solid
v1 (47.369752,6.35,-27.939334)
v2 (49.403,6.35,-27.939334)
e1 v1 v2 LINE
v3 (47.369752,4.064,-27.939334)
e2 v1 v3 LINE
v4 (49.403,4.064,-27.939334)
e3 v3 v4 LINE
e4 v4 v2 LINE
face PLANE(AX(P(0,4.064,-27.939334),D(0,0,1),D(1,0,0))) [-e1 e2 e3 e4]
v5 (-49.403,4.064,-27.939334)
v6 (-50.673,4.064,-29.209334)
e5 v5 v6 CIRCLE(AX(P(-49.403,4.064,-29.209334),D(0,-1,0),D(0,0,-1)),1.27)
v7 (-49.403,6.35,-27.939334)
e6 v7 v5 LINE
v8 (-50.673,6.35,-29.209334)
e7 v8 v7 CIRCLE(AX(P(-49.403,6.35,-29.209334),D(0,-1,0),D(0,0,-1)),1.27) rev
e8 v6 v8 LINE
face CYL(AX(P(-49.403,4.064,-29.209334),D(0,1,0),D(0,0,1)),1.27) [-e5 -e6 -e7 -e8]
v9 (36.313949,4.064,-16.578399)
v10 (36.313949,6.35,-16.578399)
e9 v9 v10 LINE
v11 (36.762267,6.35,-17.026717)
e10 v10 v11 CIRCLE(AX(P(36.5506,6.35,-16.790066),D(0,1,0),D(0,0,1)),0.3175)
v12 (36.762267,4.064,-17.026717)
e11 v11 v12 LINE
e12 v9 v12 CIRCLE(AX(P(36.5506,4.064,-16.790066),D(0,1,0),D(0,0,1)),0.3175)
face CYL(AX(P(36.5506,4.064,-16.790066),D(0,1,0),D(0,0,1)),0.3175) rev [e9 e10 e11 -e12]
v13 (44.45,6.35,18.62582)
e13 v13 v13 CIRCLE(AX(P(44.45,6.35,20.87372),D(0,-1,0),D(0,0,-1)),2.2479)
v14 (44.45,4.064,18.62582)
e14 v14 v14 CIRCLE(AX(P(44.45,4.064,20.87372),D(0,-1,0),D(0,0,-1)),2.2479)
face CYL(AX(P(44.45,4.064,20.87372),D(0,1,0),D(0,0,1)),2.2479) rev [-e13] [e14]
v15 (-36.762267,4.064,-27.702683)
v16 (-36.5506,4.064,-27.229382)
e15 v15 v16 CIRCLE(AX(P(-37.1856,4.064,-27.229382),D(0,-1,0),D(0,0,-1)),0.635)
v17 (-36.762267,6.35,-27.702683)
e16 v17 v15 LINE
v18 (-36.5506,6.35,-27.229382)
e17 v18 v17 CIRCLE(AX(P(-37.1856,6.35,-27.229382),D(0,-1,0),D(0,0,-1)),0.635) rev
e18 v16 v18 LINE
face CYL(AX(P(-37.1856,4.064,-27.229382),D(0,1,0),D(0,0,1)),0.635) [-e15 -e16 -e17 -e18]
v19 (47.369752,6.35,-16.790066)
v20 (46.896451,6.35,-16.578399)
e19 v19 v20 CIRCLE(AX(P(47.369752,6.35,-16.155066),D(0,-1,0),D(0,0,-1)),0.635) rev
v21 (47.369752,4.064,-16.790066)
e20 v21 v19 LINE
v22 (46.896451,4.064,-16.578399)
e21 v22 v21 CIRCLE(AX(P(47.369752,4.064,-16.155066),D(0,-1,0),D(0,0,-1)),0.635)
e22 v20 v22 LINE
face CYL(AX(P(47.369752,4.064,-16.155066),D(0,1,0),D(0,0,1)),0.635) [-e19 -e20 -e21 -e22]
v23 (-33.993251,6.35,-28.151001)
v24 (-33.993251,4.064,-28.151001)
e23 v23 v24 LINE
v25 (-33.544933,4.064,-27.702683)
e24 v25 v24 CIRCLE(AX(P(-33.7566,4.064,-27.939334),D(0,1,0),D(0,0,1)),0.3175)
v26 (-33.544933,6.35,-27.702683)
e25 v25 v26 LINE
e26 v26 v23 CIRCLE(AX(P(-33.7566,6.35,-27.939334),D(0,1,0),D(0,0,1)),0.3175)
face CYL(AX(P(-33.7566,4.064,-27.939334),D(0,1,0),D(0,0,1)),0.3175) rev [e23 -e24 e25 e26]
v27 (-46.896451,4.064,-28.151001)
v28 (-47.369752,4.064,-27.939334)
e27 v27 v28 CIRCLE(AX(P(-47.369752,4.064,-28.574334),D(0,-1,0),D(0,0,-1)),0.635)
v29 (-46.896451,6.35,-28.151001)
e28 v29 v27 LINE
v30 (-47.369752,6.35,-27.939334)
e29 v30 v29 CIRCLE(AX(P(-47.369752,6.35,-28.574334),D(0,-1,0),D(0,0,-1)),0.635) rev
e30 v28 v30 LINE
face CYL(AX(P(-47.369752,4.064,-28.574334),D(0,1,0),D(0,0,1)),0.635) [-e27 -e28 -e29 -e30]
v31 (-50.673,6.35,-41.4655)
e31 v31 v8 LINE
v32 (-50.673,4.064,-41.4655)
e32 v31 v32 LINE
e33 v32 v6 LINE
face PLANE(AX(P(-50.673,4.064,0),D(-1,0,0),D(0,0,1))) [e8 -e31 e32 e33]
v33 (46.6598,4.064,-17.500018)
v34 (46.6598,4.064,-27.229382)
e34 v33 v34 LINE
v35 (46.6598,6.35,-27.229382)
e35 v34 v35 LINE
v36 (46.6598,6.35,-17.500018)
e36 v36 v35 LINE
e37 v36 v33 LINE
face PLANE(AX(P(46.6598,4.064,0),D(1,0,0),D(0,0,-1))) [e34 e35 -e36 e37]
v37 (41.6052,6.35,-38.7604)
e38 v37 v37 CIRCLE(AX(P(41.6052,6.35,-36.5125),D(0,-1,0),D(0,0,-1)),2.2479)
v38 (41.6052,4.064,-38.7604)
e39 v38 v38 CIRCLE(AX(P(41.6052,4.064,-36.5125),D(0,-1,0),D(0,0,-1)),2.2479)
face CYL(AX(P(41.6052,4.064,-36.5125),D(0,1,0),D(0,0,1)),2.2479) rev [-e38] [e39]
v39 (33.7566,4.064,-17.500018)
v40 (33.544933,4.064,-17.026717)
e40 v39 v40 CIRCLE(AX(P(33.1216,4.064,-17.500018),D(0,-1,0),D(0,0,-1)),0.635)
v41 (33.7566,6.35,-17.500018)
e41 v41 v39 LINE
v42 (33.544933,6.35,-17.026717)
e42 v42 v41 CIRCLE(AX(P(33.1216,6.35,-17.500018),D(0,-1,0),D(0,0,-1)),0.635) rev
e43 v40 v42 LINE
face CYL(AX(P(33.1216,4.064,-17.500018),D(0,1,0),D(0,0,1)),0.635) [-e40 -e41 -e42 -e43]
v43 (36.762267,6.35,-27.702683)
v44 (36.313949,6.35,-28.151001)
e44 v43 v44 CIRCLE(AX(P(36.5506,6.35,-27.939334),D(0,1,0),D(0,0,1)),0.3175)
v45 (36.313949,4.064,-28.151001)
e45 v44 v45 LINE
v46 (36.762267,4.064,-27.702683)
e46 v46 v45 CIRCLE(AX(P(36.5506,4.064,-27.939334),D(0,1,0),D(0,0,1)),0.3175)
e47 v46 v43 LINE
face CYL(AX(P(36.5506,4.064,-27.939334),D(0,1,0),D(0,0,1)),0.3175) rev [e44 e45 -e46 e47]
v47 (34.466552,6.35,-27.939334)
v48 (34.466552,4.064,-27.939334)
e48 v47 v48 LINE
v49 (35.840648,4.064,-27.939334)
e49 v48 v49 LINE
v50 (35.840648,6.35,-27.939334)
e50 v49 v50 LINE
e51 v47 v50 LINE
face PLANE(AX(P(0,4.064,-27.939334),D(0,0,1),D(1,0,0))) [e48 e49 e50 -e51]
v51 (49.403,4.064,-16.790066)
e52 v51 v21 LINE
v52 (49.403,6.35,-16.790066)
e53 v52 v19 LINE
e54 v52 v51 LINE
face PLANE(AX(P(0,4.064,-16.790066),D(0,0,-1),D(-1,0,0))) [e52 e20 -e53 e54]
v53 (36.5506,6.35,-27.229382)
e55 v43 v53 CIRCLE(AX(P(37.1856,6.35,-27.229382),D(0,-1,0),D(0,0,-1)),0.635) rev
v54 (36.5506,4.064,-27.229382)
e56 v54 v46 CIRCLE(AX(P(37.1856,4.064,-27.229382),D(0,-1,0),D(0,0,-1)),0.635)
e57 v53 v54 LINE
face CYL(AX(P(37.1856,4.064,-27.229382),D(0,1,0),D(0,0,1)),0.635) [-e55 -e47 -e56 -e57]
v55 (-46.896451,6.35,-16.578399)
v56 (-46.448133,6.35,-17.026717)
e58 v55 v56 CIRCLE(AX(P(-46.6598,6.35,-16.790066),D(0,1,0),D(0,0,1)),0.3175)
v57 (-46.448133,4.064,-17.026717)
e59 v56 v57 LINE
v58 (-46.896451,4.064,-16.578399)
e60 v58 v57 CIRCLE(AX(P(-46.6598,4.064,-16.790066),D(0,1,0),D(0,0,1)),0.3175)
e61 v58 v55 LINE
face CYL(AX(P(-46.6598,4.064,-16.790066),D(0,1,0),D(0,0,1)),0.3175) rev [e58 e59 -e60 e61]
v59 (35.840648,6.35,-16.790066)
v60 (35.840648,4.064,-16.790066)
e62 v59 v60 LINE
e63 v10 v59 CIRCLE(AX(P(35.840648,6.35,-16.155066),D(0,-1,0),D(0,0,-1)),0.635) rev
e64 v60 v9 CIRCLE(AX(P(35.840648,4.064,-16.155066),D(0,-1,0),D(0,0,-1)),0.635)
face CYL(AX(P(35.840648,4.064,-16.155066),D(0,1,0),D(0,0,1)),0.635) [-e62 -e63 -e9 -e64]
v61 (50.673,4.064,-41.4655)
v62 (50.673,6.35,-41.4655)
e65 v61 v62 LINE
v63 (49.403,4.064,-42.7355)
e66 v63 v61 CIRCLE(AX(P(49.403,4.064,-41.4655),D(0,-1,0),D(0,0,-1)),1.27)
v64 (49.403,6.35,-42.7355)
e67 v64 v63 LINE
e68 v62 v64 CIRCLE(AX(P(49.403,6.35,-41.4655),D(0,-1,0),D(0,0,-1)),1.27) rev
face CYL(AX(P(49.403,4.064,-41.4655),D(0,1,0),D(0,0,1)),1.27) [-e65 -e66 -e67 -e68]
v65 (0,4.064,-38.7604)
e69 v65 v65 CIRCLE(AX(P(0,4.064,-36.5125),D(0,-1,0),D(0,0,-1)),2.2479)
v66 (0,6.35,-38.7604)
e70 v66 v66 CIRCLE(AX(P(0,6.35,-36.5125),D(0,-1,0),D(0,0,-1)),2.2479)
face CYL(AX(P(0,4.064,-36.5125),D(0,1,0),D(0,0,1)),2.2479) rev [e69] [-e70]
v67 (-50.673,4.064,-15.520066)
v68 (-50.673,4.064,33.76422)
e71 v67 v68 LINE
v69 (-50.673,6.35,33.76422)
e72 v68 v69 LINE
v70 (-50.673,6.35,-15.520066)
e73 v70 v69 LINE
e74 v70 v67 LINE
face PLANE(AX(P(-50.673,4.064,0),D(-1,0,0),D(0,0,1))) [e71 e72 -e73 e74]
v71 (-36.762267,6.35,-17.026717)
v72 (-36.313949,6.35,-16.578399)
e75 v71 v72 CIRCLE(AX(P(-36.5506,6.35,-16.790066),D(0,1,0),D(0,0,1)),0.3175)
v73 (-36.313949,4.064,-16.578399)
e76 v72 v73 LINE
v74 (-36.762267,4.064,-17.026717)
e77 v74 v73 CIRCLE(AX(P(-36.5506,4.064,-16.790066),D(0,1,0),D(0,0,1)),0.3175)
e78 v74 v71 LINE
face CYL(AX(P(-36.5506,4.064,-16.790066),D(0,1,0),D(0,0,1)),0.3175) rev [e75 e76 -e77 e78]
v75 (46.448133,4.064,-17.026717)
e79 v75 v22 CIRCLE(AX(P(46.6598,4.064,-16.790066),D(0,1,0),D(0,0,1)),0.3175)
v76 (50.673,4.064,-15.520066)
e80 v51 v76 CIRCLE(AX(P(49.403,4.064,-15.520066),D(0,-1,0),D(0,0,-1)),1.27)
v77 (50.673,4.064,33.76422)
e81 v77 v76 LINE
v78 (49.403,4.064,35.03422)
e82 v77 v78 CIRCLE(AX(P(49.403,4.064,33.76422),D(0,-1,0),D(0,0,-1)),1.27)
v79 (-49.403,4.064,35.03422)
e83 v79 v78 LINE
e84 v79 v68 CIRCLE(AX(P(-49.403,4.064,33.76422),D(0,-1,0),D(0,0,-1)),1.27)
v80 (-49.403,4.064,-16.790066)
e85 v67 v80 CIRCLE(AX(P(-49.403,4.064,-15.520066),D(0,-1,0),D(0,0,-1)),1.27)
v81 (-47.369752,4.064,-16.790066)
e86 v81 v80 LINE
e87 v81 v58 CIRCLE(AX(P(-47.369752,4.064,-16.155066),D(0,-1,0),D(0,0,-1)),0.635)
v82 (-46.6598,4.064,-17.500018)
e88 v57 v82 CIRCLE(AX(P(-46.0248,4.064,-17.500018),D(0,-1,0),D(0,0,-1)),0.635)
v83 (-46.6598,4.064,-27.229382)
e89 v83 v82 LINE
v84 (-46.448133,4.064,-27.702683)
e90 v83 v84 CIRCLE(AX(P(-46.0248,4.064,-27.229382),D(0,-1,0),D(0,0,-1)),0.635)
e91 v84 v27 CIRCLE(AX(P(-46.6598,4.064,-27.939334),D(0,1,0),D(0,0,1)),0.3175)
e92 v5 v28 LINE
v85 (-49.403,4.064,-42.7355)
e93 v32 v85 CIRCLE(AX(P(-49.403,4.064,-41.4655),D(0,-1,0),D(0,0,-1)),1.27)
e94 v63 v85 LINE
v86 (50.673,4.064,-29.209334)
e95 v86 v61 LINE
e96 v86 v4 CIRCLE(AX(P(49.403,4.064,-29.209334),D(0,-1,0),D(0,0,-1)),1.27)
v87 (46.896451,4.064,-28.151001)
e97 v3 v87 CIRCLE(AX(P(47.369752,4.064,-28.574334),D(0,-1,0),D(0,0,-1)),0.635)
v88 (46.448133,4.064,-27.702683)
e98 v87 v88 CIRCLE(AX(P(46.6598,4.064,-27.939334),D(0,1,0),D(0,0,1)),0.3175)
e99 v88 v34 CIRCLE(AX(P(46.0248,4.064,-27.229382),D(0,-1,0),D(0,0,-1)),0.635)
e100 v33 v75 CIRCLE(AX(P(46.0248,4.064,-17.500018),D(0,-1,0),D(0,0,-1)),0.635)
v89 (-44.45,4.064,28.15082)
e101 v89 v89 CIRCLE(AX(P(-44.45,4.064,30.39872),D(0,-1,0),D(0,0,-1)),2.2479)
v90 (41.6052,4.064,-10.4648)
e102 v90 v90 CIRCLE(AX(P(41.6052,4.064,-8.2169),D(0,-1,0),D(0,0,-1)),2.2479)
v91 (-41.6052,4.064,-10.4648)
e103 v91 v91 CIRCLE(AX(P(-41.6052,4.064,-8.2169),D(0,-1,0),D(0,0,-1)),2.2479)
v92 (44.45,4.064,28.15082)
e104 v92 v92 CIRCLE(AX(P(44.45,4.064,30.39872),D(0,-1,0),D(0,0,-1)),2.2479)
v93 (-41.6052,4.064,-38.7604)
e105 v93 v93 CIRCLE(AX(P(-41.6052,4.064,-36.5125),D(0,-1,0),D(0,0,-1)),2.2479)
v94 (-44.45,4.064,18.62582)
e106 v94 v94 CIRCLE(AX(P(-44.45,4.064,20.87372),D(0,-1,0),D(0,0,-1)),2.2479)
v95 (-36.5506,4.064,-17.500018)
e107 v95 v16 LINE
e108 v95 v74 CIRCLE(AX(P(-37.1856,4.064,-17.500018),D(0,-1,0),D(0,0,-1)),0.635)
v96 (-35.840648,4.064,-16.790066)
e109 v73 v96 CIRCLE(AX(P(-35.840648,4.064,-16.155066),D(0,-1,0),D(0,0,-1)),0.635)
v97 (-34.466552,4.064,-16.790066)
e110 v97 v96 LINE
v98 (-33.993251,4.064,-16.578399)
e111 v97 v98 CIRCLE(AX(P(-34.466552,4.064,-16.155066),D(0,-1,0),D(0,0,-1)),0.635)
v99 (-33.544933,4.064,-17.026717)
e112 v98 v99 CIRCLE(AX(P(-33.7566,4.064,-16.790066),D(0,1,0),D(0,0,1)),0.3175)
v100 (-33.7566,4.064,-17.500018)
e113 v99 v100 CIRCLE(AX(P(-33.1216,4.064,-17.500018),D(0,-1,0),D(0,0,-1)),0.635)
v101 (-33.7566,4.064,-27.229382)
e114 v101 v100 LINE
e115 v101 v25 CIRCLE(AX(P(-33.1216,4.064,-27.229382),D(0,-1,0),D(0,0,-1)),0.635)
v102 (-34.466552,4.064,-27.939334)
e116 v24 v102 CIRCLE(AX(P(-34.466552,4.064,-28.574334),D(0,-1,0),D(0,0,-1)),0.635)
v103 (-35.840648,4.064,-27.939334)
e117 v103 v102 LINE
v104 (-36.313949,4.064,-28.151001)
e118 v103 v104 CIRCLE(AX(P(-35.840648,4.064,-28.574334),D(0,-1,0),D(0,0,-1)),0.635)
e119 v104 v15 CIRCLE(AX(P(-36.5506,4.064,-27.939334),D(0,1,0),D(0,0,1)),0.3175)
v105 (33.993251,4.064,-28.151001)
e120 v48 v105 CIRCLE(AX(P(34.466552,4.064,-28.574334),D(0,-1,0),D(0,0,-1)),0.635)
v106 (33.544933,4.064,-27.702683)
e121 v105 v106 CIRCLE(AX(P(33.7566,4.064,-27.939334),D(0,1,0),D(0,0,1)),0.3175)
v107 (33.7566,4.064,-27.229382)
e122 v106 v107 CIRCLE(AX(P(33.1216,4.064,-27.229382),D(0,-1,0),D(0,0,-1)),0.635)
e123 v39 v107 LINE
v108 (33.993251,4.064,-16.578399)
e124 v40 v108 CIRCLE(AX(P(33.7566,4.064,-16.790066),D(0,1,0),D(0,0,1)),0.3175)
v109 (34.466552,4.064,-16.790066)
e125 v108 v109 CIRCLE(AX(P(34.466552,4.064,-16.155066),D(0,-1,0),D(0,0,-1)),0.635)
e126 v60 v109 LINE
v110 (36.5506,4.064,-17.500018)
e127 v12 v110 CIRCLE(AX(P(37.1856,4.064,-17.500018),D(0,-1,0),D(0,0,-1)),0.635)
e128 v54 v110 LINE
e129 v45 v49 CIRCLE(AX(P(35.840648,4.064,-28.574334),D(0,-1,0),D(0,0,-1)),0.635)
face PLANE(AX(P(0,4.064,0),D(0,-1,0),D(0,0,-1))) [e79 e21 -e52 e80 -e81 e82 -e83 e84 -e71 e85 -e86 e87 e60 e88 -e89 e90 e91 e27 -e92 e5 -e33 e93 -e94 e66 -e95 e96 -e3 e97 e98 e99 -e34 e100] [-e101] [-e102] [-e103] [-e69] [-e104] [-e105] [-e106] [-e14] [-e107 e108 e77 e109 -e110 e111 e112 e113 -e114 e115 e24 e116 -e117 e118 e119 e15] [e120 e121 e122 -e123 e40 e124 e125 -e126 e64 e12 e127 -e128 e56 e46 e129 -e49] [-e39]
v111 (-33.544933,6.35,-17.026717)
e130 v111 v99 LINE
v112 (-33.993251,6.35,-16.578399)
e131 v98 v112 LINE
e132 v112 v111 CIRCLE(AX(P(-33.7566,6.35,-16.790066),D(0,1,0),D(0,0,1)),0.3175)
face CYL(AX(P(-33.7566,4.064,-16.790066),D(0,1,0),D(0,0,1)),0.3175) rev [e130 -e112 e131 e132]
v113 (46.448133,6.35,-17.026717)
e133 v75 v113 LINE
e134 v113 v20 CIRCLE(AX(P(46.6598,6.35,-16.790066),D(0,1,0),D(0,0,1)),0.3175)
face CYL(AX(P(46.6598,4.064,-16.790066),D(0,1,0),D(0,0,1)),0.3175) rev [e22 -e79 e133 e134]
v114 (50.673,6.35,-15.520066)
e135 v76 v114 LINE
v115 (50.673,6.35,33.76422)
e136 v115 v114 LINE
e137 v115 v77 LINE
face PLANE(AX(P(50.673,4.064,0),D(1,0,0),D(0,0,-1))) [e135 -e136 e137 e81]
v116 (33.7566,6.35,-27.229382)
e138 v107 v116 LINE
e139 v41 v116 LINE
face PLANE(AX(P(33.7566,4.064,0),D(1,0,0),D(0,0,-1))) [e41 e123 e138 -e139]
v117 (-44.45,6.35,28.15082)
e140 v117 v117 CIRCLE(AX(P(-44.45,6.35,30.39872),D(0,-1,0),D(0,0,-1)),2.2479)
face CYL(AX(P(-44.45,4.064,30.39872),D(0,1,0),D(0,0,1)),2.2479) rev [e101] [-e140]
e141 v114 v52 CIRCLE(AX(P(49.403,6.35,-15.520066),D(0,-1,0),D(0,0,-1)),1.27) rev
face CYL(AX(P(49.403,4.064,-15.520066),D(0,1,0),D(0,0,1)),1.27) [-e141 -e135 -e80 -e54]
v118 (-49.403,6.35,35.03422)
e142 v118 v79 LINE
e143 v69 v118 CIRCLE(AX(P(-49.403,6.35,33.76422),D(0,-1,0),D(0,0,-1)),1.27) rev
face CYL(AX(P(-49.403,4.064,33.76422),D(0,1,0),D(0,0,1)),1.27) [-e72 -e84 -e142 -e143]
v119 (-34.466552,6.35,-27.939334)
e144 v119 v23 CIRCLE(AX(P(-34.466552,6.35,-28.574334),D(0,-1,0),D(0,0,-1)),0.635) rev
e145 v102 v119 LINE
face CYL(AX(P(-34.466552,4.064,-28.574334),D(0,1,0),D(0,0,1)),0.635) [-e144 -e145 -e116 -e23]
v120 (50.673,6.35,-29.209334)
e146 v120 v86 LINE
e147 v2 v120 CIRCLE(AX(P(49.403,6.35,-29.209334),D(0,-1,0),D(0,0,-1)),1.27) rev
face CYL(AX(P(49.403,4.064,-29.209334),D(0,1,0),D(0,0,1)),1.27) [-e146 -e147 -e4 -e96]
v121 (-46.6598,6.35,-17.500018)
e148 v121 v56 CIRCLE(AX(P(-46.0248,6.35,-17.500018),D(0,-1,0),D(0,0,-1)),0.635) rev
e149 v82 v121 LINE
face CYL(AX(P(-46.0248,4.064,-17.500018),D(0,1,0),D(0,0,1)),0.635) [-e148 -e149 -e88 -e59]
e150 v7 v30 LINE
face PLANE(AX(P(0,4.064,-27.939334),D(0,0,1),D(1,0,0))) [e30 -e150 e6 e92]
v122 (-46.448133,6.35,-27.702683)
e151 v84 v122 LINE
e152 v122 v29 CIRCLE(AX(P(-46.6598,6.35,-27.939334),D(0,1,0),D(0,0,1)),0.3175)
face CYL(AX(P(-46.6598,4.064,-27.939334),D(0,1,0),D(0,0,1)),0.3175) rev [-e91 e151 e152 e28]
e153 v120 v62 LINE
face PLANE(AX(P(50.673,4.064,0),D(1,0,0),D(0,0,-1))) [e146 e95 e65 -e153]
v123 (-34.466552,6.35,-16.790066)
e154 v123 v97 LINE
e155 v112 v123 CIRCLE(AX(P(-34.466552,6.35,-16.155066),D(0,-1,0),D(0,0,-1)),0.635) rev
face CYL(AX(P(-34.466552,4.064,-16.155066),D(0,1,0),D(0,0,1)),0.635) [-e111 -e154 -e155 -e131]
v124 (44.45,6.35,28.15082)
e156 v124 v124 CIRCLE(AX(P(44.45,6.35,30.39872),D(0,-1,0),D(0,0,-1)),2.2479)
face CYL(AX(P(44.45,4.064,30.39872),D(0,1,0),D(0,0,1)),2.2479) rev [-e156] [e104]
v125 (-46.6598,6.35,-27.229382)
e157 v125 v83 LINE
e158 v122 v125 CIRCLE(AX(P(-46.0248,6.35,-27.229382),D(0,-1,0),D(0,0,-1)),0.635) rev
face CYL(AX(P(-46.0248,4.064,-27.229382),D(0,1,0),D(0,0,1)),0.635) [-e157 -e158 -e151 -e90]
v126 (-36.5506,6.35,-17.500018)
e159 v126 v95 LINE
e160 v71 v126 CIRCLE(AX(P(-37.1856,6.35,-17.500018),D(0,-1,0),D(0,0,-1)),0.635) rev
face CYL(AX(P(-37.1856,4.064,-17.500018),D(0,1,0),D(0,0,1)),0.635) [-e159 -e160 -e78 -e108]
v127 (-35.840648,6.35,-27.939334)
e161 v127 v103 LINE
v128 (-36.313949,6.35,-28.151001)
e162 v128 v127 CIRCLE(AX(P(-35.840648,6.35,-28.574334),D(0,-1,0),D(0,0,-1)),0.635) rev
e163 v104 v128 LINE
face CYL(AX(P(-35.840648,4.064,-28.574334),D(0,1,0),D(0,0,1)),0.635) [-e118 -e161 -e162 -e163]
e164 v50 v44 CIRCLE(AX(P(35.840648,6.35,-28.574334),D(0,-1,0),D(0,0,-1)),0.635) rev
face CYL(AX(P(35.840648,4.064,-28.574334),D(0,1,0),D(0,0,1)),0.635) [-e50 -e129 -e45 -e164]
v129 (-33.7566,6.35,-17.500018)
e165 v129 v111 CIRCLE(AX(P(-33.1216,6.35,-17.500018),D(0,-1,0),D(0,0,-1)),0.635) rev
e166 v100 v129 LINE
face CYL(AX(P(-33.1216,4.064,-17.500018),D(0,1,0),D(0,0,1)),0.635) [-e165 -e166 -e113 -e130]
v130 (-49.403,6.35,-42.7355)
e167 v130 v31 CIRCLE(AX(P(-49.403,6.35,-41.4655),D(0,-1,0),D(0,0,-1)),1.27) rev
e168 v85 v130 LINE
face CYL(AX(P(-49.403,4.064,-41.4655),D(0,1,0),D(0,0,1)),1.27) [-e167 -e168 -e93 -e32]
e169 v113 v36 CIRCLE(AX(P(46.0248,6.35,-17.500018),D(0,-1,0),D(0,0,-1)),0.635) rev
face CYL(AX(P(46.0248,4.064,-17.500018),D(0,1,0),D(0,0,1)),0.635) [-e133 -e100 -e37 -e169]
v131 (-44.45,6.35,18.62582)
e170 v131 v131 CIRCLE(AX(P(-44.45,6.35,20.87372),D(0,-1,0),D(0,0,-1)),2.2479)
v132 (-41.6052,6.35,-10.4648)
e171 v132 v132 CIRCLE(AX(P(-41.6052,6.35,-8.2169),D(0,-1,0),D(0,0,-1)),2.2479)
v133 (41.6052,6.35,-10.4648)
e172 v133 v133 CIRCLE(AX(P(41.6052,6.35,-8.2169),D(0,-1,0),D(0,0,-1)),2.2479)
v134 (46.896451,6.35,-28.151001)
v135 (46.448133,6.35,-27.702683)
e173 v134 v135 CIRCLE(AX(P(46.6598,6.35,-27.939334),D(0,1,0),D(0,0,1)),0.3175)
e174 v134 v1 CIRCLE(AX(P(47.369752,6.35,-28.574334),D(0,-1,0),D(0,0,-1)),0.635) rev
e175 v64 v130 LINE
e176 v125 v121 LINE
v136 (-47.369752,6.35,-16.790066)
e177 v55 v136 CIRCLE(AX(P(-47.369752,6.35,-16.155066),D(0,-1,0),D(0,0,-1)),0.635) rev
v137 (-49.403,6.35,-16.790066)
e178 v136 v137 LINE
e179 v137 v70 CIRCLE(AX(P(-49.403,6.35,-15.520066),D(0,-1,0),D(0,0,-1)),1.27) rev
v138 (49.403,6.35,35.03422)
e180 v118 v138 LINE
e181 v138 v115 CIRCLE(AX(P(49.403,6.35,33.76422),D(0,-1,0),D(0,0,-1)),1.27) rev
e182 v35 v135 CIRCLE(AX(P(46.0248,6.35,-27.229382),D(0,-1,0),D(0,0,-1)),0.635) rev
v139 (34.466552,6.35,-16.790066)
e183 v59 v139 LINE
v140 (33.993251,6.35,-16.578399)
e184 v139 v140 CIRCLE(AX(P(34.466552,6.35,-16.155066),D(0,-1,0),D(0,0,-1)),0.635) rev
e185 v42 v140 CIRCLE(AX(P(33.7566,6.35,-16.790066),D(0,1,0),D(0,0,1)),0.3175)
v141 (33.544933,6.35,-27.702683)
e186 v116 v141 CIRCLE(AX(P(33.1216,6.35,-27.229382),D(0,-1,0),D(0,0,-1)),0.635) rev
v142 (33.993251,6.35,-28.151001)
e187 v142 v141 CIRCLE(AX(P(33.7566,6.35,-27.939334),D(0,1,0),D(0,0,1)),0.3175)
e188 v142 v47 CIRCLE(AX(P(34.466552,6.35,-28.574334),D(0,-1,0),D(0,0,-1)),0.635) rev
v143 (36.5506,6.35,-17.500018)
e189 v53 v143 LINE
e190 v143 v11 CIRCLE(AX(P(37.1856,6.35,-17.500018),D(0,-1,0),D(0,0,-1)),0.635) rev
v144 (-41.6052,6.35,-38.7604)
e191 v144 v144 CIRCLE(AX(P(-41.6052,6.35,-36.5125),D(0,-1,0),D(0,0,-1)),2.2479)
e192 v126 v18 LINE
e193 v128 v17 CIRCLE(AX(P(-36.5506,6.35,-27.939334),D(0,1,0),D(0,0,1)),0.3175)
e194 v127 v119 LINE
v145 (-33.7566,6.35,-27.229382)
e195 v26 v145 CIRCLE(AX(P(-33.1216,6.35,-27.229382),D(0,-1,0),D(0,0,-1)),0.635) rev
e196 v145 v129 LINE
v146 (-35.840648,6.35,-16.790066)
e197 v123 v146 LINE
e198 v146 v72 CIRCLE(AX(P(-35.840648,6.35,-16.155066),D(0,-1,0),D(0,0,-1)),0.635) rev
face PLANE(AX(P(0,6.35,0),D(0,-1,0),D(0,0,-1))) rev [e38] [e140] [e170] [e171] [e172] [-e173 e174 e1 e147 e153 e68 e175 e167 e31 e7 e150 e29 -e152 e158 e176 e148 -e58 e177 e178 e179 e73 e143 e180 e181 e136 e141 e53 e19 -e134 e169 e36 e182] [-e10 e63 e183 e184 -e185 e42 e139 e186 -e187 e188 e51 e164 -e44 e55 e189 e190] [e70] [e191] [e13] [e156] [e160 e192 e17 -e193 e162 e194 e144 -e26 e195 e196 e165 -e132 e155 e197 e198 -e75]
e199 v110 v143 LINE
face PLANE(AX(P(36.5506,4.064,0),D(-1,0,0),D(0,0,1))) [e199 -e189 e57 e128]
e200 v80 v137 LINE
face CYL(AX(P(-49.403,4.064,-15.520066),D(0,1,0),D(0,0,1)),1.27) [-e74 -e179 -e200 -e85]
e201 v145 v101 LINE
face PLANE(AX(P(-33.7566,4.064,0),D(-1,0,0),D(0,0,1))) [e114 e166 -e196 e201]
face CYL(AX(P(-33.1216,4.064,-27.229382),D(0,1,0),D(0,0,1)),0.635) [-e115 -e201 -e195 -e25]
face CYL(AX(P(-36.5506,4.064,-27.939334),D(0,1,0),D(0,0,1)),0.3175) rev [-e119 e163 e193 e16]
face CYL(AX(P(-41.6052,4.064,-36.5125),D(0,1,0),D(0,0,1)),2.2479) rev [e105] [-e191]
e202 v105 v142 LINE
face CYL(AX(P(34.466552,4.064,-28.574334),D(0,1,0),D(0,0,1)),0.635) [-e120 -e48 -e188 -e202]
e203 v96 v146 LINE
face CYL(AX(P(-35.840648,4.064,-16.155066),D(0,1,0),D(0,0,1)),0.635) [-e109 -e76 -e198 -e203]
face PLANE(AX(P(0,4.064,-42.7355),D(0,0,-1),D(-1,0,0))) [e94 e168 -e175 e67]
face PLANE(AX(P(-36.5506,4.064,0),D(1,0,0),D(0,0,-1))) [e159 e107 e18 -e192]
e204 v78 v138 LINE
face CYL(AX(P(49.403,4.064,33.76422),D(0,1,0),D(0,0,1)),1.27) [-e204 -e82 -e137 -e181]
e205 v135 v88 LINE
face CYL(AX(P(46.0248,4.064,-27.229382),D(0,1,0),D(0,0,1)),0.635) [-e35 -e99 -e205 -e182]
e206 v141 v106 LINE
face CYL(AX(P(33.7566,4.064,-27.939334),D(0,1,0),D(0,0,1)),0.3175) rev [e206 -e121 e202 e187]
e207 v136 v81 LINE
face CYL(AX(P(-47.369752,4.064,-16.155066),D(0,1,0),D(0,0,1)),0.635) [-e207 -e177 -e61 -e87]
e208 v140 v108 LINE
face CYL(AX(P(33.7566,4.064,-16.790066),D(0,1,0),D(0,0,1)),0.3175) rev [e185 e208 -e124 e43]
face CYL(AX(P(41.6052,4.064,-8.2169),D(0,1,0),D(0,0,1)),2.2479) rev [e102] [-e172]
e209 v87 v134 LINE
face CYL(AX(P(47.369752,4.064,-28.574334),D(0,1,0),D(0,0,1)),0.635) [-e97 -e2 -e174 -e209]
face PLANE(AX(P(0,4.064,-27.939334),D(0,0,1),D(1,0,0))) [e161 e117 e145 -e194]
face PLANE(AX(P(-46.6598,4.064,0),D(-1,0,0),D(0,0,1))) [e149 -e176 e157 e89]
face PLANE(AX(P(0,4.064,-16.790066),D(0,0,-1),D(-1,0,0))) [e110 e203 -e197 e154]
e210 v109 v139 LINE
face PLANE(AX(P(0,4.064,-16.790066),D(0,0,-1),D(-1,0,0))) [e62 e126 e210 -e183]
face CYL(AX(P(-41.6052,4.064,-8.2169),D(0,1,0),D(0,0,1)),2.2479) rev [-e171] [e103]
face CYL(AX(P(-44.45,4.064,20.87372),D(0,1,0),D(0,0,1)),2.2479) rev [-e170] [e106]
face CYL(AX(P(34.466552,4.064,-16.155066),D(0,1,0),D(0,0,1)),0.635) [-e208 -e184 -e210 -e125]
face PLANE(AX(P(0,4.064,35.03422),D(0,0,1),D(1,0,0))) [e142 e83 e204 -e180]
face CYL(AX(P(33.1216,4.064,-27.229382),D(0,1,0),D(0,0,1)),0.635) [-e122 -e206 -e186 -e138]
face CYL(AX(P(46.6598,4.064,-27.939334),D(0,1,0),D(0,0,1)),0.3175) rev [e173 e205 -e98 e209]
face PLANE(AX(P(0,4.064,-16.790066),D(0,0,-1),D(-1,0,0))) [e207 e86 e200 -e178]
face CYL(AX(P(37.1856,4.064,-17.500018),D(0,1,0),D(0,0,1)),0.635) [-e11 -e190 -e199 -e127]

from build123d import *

# Parameters (mm, degrees)
STOCK_BEE_ZERKER_START                     = 4.064
STOCK_BEE_ZERKER_2_0_MULTIBODY_1_OUTLINE_R = 2.2479
STOCK_BEE_ZERKER_2_0_MULTIBODY_1_OUTLINE_W = 2.54
STOCK_BEE_ZERKER_2_0_MULTIBODY_1_OUTLINE_H = 10.89526775
STOCK_BEE_ZERKER_2_0_MULTIBODY_1_DEPTH     = 2.286
SKETCH1_W                                  = 2.794
SKETCH1_H                                  = 11.14926775
SKETCH1_W_2                                = 2.54
SKETCH1_H_2                                = 10.89526775
CUT_EXTRUDE1_DEPTH                         = 67.506087708
SKETCH2_R                                  = 0.3175
CUT_EXTRUDE2_DEPTH                         = 67.327231853
FILLET1_R                                  = 0.635
FILLET2_R                                  = 1.27


# Read off the part's stored shape, not the designer's step: Stock-Bee-zerker 2.0 Multibody-1
with BuildPart() as part:
    # Stock-Bee-zerker 2.0 Multibody-1 outline → Stock-Bee-zerker 2.0 Multibody-1 (new body)
    with BuildSketch(Plane(origin=(0, 0, 0), x_dir=(1, 0, 0), z_dir=(0, 1, 0)).offset(STOCK_BEE_ZERKER_START)):
        Polygon((-50.8, 16.917066125), (-50.8, -35.16122), (50.8, -35.16122), (50.8, 16.917066125), (46.7868, 16.917066125), (46.7868, 27.812333875), (50.8, 27.812333875), (50.8, 42.8625), (-50.8, 42.8625), (-50.8, 27.812333875), (-46.7868, 27.812333875), (-46.7868, 16.917066125), align=None)
        with Locations((-44.45, -30.39872)):
            Circle(STOCK_BEE_ZERKER_2_0_MULTIBODY_1_OUTLINE_R, mode=Mode.SUBTRACT)
        with Locations((-44.45, -20.87372)):
            Circle(STOCK_BEE_ZERKER_2_0_MULTIBODY_1_OUTLINE_R, mode=Mode.SUBTRACT)
        with Locations((44.45, -30.39872)):
            Circle(STOCK_BEE_ZERKER_2_0_MULTIBODY_1_OUTLINE_R, mode=Mode.SUBTRACT)
        with Locations((44.45, -20.87372)):
            Circle(STOCK_BEE_ZERKER_2_0_MULTIBODY_1_OUTLINE_R, mode=Mode.SUBTRACT)
        with Locations((-41.6052, 8.2169)):
            Circle(STOCK_BEE_ZERKER_2_0_MULTIBODY_1_OUTLINE_R, mode=Mode.SUBTRACT)
        with Locations((-35.1536, 22.3647)):
            Rectangle(STOCK_BEE_ZERKER_2_0_MULTIBODY_1_OUTLINE_W, STOCK_BEE_ZERKER_2_0_MULTIBODY_1_OUTLINE_H, mode=Mode.SUBTRACT)
        with Locations((-41.6052, 36.5125)):
            Circle(STOCK_BEE_ZERKER_2_0_MULTIBODY_1_OUTLINE_R, mode=Mode.SUBTRACT)
        with Locations((0, 36.5125)):
            Circle(STOCK_BEE_ZERKER_2_0_MULTIBODY_1_OUTLINE_R, mode=Mode.SUBTRACT)
        with Locations((41.6052, 8.2169)):
            Circle(STOCK_BEE_ZERKER_2_0_MULTIBODY_1_OUTLINE_R, mode=Mode.SUBTRACT)
        with Locations((35.1536, 22.3647)):
            Rectangle(STOCK_BEE_ZERKER_2_0_MULTIBODY_1_OUTLINE_W, STOCK_BEE_ZERKER_2_0_MULTIBODY_1_OUTLINE_H, mode=Mode.SUBTRACT)
        with Locations((41.6052, 36.5125)):
            Circle(STOCK_BEE_ZERKER_2_0_MULTIBODY_1_OUTLINE_R, mode=Mode.SUBTRACT)
    extrude(amount=STOCK_BEE_ZERKER_2_0_MULTIBODY_1_DEPTH)

    # Sketch1 → Cut-Extrude1 (cut, through all)
    # profile 1 of 3: a face of its own
    with BuildSketch(Plane(origin=(0, 6.35, 0), x_dir=(1, 0, 0), z_dir=(0, 1, 0))):
        Polygon((-46.7868, 16.917066125), (-50.8, 16.917066125), (-50.8, -35.16122), (50.8, -35.16122), (50.8, 16.917066125), (46.7868, 16.917066125), (46.7868, 27.812333875), (50.8, 27.812333875), (50.8, 42.8625), (-50.8, 42.8625), (-50.8, 27.812333875), (-46.7868, 27.812333875), align=None)
        Polygon((-46.6598, 16.790066125), (-50.673, 16.790066125), (-50.673, -35.03422), (50.673, -35.03422), (50.673, 16.790066125), (46.6598, 16.790066125), (46.6598, 27.939333875), (50.673, 27.939333875), (50.673, 42.7355), (-50.673, 42.7355), (-50.673, 27.939333875), (-46.6598, 27.939333875), align=None, mode=Mode.SUBTRACT)
    # profile 2 of 3: a face of its own
    with BuildSketch(Plane(origin=(0, 6.35, 0), x_dir=(1, 0, 0), z_dir=(0, 1, 0))):
        with Locations((-35.1536, 22.3647)):
            Rectangle(SKETCH1_W, SKETCH1_H)
        with Locations((-35.1536, 22.3647)):
            Rectangle(SKETCH1_W_2, SKETCH1_H_2, mode=Mode.SUBTRACT)
    # profile 3 of 3: a face of its own
    with BuildSketch(Plane(origin=(0, 6.35, 0), x_dir=(1, 0, 0), z_dir=(0, 1, 0))):
        with Locations((35.1536, 22.3647)):
            Rectangle(SKETCH1_W, SKETCH1_H)
        with Locations((35.1536, 22.3647)):
            Rectangle(SKETCH1_W_2, SKETCH1_H_2, mode=Mode.SUBTRACT)
    extrude(amount=-CUT_EXTRUDE1_DEPTH, mode=Mode.SUBTRACT)

    # Sketch2 → Cut-Extrude2 (cut, through all)
    with BuildSketch(Plane(origin=(0, 6.35, 0), x_dir=(1, 0, 0), z_dir=(0, 1, 0))):
        with Locations((-46.6598, 27.939333875)):
            Circle(SKETCH2_R)
        with Locations((-46.6598, 16.790066125)):
            Circle(SKETCH2_R)
        with Locations((-36.5506, 16.790066125)):
            Circle(SKETCH2_R)
        with Locations((-33.7566, 16.790066125)):
            Circle(SKETCH2_R)
        with Locations((-33.7566, 27.939333875)):
            Circle(SKETCH2_R)
        with Locations((-36.5506, 27.939333875)):
            Circle(SKETCH2_R)
        with Locations((33.7566, 27.939333875)):
            Circle(SKETCH2_R)
        with Locations((36.5506, 27.939333875)):
            Circle(SKETCH2_R)
        with Locations((33.7566, 16.790066125)):
            Circle(SKETCH2_R)
        with Locations((36.5506, 16.790066125)):
            Circle(SKETCH2_R)
        with Locations((46.6598, 16.790066125)):
            Circle(SKETCH2_R)
        with Locations((46.6598, 27.939333875)):
            Circle(SKETCH2_R)
    extrude(amount=-CUT_EXTRUDE2_DEPTH, mode=Mode.SUBTRACT)

    # Fillet1
    fillet1_edges = [part.edges().sort_by_distance(p)[0] for p in [
        (33.7566, 5.207, -17.107566125),
        (33.7566, 5.207, -27.621833875),
        (36.2331, 5.207, -16.790066125),
        (36.5506, 5.207, -27.621833875),
        (-36.5506, 5.207, -17.107566125),
        (-36.5506, 5.207, -27.621833875),
        (-34.0741, 5.207, -16.790066125),
        (-33.7566, 5.207, -27.621833875),
        (-46.6598, 5.207, -27.621833875),
        (-46.6598, 5.207, -17.107566125),
        (46.9773, 5.207, -27.939333875),
        (46.6598, 5.207, -17.107566125),
        (-36.2331, 5.207, -27.939333875),
        (34.0741, 5.207, -27.939333875),
        (36.2331, 5.207, -27.939333875),
        (34.0741, 5.207, -16.790066125),
        (-34.0741, 5.207, -27.939333875),
        (-33.7566, 5.207, -17.107566125),
        (-36.2331, 5.207, -16.790066125),
        (-46.9773, 5.207, -16.790066125),
        (36.5506, 5.207, -17.107566125),
        (46.9773, 5.207, -16.790066125),
        (46.6598, 5.207, -27.621833875),
        (-46.9773, 5.207, -27.939333875),
    ]]
    fillet(fillet1_edges, radius=FILLET1_R)

    # Fillet2
    fillet2_edges = [part.edges().sort_by_distance(p)[0] for p in [
        (-50.673, 5.207, -16.790066125),
        (-50.673, 5.207, 35.03422),
        (50.673, 5.207, 35.03422),
        (50.673, 5.207, -16.790066125),
        (50.673, 5.207, -27.939333875),
        (50.673, 5.207, -42.7355),
        (-50.673, 5.207, -42.7355),
        (-50.673, 5.207, -27.939333875),
    ]]
    fillet(fillet2_edges, radius=FILLET2_R)


solid = part.part
